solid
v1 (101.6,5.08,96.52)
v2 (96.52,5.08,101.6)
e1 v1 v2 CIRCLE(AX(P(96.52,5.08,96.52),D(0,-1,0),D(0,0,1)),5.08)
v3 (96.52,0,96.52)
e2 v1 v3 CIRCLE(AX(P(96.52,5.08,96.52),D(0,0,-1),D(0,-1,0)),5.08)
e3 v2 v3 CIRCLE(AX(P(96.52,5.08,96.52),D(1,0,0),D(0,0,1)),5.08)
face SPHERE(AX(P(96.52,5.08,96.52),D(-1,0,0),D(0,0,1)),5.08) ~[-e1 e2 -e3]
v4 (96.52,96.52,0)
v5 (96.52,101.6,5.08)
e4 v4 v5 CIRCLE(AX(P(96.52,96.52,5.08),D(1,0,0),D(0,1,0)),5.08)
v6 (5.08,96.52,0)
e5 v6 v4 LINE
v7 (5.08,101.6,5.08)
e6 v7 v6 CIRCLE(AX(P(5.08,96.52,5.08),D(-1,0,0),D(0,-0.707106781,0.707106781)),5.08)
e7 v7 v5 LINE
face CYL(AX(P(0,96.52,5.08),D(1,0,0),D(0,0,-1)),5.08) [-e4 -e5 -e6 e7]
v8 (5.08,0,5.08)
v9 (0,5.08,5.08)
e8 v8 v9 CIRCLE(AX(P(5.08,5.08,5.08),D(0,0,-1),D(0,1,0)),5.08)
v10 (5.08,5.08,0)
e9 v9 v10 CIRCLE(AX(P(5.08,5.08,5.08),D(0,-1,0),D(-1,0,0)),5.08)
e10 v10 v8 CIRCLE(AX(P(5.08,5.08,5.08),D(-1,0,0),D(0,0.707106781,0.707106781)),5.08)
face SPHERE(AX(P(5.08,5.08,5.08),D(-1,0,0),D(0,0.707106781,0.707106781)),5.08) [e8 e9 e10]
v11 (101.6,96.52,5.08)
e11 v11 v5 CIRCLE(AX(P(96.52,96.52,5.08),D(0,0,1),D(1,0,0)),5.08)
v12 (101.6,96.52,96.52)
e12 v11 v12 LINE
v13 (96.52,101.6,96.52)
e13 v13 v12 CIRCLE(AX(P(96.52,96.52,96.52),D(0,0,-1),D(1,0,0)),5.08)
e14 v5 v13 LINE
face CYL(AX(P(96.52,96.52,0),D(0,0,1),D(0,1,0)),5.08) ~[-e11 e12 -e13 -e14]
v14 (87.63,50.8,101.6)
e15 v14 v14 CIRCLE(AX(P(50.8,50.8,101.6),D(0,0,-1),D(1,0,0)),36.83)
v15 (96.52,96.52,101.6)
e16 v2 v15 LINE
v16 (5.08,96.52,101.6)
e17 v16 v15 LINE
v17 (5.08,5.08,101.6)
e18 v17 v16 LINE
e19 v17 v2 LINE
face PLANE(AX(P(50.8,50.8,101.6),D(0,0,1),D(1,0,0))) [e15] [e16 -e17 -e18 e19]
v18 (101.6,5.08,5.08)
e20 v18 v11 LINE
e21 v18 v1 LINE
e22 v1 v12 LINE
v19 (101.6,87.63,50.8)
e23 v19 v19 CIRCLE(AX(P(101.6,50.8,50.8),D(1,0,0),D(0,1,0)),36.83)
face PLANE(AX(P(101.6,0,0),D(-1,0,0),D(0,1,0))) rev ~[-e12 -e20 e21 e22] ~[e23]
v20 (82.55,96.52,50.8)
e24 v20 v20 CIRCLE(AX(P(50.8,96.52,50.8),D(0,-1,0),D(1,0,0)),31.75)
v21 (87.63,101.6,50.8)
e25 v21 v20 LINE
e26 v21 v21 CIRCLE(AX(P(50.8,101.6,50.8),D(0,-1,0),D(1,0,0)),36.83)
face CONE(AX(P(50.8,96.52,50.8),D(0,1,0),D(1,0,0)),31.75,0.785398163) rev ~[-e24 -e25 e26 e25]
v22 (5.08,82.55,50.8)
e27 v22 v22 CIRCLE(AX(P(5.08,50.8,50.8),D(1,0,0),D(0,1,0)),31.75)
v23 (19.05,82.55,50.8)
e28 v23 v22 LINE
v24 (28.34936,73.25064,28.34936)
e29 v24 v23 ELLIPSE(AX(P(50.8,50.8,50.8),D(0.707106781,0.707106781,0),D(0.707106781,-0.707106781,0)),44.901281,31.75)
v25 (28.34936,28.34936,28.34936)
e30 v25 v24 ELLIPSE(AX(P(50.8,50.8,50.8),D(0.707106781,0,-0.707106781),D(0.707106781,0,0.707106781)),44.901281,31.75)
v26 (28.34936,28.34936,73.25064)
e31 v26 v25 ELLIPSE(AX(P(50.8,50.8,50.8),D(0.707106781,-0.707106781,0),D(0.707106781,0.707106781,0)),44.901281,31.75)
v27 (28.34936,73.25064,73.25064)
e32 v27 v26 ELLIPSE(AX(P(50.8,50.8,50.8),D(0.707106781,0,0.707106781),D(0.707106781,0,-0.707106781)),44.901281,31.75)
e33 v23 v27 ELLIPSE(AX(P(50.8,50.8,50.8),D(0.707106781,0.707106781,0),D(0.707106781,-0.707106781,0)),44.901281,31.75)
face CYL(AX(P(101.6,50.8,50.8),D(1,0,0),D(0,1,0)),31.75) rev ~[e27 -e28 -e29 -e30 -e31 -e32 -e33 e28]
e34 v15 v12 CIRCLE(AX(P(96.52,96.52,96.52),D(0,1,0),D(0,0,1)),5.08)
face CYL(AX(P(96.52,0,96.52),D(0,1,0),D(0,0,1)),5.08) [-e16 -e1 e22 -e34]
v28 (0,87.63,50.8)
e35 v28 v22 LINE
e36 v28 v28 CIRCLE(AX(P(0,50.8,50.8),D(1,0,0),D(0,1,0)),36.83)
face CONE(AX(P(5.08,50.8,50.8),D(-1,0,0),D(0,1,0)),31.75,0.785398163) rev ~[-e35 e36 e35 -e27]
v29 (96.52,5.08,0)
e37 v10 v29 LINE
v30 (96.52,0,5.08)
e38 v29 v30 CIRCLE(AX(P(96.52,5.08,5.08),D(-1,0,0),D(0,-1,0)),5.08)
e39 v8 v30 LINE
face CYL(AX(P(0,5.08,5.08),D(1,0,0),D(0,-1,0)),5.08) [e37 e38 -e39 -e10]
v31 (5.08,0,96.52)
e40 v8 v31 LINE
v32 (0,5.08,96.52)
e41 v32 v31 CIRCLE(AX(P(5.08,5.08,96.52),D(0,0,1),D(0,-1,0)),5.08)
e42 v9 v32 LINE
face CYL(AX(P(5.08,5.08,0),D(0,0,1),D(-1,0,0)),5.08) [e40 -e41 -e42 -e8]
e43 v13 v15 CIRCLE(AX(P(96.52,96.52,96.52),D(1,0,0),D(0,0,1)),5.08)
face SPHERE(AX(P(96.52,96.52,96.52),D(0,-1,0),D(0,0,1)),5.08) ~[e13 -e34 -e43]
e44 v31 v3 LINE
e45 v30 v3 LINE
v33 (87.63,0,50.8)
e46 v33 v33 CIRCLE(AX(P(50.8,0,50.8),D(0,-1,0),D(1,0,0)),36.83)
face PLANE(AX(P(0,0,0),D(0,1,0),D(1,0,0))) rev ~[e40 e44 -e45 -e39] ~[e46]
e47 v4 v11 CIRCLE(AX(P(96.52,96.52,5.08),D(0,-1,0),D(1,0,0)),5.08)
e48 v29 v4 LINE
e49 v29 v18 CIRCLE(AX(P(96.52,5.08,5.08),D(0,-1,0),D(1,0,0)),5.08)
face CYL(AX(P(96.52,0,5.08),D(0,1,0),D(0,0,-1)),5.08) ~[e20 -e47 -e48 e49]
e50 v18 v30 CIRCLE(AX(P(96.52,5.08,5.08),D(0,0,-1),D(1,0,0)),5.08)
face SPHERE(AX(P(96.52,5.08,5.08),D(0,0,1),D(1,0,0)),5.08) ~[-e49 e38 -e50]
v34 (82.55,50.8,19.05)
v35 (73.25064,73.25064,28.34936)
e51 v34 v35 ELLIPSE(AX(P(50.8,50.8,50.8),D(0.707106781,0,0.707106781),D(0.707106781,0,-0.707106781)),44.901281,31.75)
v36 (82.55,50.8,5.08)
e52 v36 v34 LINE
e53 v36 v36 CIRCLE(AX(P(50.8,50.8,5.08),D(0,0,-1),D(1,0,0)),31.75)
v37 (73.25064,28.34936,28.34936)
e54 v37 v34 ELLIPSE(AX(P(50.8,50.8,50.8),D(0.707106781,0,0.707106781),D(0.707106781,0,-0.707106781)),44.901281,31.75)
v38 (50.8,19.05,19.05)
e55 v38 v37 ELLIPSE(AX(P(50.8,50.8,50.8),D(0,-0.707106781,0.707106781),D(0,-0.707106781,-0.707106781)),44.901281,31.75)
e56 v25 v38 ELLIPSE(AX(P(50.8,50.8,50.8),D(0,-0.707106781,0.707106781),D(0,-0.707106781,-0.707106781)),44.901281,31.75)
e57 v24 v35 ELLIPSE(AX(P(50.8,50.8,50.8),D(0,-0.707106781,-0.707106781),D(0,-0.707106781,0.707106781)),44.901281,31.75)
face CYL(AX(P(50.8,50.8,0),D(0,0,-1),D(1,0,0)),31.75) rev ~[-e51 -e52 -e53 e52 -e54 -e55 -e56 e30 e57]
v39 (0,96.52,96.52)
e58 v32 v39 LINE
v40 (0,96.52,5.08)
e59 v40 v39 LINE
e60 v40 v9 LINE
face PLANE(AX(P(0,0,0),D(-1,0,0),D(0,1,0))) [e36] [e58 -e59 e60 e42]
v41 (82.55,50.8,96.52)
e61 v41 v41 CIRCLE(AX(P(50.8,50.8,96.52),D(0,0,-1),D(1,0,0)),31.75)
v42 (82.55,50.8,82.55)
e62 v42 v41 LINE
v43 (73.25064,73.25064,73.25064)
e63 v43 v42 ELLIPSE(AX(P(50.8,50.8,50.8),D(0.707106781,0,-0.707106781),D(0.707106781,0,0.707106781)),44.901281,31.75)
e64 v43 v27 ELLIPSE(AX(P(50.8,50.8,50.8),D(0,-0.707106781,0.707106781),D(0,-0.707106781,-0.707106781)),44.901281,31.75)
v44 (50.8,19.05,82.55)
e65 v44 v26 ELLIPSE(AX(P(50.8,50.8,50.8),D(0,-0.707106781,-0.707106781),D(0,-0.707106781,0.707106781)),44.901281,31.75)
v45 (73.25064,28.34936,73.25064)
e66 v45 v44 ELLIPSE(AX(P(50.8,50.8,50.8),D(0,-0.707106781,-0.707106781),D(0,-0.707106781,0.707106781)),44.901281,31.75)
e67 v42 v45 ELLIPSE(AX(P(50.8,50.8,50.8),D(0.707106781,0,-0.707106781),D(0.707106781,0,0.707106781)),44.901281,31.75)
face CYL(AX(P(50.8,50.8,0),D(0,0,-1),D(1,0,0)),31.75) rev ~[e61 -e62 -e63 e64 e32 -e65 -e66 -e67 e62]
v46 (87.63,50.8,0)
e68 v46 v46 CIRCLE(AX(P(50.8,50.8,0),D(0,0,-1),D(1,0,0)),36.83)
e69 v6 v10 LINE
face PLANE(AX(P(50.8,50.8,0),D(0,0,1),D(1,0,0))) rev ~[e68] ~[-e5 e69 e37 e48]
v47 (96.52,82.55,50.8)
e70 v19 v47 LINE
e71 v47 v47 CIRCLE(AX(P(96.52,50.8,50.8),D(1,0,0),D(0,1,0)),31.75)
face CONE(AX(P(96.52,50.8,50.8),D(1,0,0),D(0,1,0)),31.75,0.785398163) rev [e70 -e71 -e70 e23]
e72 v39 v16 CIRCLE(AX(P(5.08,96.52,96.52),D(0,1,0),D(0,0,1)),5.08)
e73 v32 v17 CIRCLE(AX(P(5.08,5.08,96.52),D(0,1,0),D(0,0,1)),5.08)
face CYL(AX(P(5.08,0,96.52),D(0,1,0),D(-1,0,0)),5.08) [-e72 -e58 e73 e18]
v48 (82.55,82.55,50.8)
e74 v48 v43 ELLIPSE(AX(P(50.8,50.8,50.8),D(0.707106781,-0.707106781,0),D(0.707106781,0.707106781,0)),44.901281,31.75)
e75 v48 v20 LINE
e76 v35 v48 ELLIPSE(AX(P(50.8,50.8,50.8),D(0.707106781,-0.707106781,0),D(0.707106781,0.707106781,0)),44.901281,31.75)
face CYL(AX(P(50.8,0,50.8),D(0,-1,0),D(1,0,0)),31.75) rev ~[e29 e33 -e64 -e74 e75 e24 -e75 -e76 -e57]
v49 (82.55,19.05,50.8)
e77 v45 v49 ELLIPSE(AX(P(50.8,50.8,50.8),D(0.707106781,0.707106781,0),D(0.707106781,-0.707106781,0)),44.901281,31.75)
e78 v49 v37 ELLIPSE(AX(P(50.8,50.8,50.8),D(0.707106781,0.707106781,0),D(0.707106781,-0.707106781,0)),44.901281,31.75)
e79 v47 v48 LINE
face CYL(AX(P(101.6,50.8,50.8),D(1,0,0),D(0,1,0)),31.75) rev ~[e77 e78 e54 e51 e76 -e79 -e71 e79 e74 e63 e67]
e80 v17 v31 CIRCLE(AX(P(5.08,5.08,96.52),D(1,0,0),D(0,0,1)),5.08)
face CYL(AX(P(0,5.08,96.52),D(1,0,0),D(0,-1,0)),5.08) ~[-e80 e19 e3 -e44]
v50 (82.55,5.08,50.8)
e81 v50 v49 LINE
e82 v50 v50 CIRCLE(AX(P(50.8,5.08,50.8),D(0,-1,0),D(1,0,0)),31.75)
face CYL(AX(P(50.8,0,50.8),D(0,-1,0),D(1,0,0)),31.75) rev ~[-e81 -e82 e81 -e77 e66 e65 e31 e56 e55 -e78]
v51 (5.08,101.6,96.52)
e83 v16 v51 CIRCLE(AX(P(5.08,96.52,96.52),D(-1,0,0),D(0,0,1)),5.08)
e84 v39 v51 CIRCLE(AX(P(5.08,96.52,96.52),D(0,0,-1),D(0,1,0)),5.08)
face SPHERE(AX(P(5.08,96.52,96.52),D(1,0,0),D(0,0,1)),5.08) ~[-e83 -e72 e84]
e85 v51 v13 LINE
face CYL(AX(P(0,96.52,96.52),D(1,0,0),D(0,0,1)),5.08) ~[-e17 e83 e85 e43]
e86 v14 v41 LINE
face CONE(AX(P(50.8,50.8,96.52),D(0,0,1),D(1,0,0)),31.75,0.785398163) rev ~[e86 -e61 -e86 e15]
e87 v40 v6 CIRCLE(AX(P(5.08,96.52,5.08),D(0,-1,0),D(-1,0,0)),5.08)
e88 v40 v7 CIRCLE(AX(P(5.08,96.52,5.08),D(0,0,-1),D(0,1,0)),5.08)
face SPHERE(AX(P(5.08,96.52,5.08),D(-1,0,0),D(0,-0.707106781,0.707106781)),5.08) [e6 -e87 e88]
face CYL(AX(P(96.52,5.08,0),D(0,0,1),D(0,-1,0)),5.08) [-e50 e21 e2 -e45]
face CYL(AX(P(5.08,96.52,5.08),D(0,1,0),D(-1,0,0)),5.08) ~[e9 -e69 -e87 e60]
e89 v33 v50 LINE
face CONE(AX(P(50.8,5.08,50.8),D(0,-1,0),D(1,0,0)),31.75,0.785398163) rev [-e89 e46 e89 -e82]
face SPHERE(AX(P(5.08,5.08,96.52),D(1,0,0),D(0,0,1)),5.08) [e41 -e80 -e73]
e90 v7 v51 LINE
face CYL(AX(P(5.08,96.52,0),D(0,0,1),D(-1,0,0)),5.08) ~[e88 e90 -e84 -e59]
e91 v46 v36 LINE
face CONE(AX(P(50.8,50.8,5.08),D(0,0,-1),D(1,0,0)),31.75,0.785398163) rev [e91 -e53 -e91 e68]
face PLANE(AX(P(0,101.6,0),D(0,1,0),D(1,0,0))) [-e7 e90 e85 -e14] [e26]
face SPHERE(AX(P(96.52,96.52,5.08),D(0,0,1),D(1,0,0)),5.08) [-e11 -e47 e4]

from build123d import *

# Parameters (mm, degrees)
F0_W         = 101.6
F0_H         = 101.6
F1_DEPTH     = 101.6
F2_R         = 31.75
F1_FACE1_W   = 101.6
F1_FACE1_H   = 101.6
F3_DEPTH     = 101.6
F4_R         = 31.75
F5_DEPTH     = 101.6
F6_R         = 31.75
F7_DEPTH     = 101.6
F8_R         = 5.08
F9_T1_DEPTH  = 91.44
F9_S5_W      = 5.08
F9_S5_H      = 5.08
F9_T6_DEPTH  = 5.08
F9_S11_W     = 5.08
F9_S11_H     = 5.08
F9_T12_DEPTH = 5.08
F10_SIZE     = 5.08


# Not quite as in the source:
# - a fillet or chamfer that OpenCascade refuses, or shapes differently, is made with other operations: its cross-section is extruded or revolved along the edge and cut away or added


with BuildPart() as f1:
    # F0 (on Top) → F1 (new body)
    with BuildSketch(Plane.XY):
        with Locations((50.8, 50.8)):
            Rectangle(F0_W, F0_H)
    extrude(amount=F1_DEPTH)

    # F2 (on face) + F1_face1 (on face) → F3 (cut)
    with BuildSketch(Plane.YZ.offset(101.6)):
        with Locations((50.8, 50.8)):
            Circle(F2_R)
    with BuildSketch(Plane(origin=(0, 50.8, 50.8), x_dir=(0, -1, 0), z_dir=(-1, 0, 0))):
        Rectangle(F1_FACE1_W, F1_FACE1_H)
    extrude(amount=-F3_DEPTH, dir=(1, 0, 0), mode=Mode.SUBTRACT)

    # F4 (on face) → F5 (cut)
    with BuildSketch(Plane.XZ):
        with Locations((50.8, 50.8)):
            Circle(F4_R)
    extrude(amount=-F5_DEPTH, mode=Mode.SUBTRACT)

    # F6 (on face) → F7 (cut)
    with BuildSketch(Plane(origin=(0, 0, 0), x_dir=(1, 0, 0), z_dir=(0, 0, -1))):
        with Locations((50.8, -50.8)):
            Circle(F6_R)
    extrude(amount=-F7_DEPTH, mode=Mode.SUBTRACT)

    # F8
    f8_edges = [f1.edges().sort_by_distance(p)[0] for p in [
        (50.8, 0, 101.6),
        (101.6, 50.8, 101.6),
        (50.8, 101.6, 101.6),
        (0, 50.8, 101.6),
        (101.6, 101.6, 50.8),
        (101.6, 0, 50.8),
        (101.6, 50.8, 0),
        (50.8, 101.6, 0),
        (0, 101.6, 50.8),
        (50.8, 0, 0),
        (0, 0, 50.8),
    ]]
    fillet(f8_edges, radius=F8_R)

    # F9: fillet of radius 5.08 on 1 edges, made by hand

    # F9_s2 → F9_t1 (cut)
    with BuildSketch(Plane.XZ.offset(-96.52)):
        with BuildLine():
            ThreePointArc((0, 5.08), (1.4878975516, 1.4878975516), (5.08, 0))
            Line((5.08, 0), (0, 0))
            Line((0, 0), (0, 5.08))
        make_face()
    extrude(amount=F9_T1_DEPTH, mode=Mode.SUBTRACT)


with BuildPart() as f9_tool4:
    # F9_s5 → F9_t6 (new body)
    with BuildSketch(Plane.YZ.offset(5.08)):
        with Locations((99.06, 2.54)):
            Rectangle(F9_S5_W, F9_S5_H)
    extrude(amount=-F9_T6_DEPTH)

    # F9_s7 → F9_t8 (revolve, cut)
    with BuildSketch(Plane(origin=(5.08, 96.52, 5.08), x_dir=(0, -0.7071067812, 0.7071067812), z_dir=(0, -0.7071067812, -0.7071067812))):
        with BuildLine():
            ThreePointArc((0, -5.08), (5.08, 0), (0, 5.08))
            Line((0, 5.08), (0, -5.08))
        make_face()
    revolve(axis=Axis((5.08, 96.52, 5.08), (-1, 0, 0)), mode=Mode.SUBTRACT)


with BuildPart() as f1_1:
    add(f1.part)

    # F9_t3: cut F9_tool4
    add(f9_tool4.part, mode=Mode.SUBTRACT)


with BuildPart() as f9_tool10:
    # F9_s11 → F9_t12 (new body)
    with BuildSketch(Plane.YZ.offset(5.08)):
        with Locations((2.54, 2.54)):
            Rectangle(F9_S11_W, F9_S11_H)
    extrude(amount=-F9_T12_DEPTH)

    # F9_s13 → F9_t14 (revolve, cut)
    with BuildSketch(Plane(origin=(5.08, 5.08, 5.08), x_dir=(0, 0.7071067812, 0.7071067812), z_dir=(0, -0.7071067812, 0.7071067812))):
        with BuildLine():
            ThreePointArc((0, -5.08), (5.08, 0), (0, 5.08))
            Line((0, 5.08), (0, -5.08))
        make_face()
    revolve(axis=Axis((5.08, 5.08, 5.08), (-1, 0, 0)), mode=Mode.SUBTRACT)


with BuildPart() as f1_2:
    add(f1_1.part)

    # F9_t9: cut F9_tool10
    add(f9_tool10.part, mode=Mode.SUBTRACT)

    # F10
    f10_edges = [f1_2.edges().sort_by_distance(p)[0] for p in [
        (101.6, 19.05, 50.8),
        (0, 19.05, 50.8),
        (19.05, 50.8, 0),
        (19.05, 0, 50.8),
        (19.05, 50.8, 101.6),
        (19.05, 101.6, 50.8),
    ]]
    chamfer(f10_edges, length=F10_SIZE)


solid = f1_2.part
